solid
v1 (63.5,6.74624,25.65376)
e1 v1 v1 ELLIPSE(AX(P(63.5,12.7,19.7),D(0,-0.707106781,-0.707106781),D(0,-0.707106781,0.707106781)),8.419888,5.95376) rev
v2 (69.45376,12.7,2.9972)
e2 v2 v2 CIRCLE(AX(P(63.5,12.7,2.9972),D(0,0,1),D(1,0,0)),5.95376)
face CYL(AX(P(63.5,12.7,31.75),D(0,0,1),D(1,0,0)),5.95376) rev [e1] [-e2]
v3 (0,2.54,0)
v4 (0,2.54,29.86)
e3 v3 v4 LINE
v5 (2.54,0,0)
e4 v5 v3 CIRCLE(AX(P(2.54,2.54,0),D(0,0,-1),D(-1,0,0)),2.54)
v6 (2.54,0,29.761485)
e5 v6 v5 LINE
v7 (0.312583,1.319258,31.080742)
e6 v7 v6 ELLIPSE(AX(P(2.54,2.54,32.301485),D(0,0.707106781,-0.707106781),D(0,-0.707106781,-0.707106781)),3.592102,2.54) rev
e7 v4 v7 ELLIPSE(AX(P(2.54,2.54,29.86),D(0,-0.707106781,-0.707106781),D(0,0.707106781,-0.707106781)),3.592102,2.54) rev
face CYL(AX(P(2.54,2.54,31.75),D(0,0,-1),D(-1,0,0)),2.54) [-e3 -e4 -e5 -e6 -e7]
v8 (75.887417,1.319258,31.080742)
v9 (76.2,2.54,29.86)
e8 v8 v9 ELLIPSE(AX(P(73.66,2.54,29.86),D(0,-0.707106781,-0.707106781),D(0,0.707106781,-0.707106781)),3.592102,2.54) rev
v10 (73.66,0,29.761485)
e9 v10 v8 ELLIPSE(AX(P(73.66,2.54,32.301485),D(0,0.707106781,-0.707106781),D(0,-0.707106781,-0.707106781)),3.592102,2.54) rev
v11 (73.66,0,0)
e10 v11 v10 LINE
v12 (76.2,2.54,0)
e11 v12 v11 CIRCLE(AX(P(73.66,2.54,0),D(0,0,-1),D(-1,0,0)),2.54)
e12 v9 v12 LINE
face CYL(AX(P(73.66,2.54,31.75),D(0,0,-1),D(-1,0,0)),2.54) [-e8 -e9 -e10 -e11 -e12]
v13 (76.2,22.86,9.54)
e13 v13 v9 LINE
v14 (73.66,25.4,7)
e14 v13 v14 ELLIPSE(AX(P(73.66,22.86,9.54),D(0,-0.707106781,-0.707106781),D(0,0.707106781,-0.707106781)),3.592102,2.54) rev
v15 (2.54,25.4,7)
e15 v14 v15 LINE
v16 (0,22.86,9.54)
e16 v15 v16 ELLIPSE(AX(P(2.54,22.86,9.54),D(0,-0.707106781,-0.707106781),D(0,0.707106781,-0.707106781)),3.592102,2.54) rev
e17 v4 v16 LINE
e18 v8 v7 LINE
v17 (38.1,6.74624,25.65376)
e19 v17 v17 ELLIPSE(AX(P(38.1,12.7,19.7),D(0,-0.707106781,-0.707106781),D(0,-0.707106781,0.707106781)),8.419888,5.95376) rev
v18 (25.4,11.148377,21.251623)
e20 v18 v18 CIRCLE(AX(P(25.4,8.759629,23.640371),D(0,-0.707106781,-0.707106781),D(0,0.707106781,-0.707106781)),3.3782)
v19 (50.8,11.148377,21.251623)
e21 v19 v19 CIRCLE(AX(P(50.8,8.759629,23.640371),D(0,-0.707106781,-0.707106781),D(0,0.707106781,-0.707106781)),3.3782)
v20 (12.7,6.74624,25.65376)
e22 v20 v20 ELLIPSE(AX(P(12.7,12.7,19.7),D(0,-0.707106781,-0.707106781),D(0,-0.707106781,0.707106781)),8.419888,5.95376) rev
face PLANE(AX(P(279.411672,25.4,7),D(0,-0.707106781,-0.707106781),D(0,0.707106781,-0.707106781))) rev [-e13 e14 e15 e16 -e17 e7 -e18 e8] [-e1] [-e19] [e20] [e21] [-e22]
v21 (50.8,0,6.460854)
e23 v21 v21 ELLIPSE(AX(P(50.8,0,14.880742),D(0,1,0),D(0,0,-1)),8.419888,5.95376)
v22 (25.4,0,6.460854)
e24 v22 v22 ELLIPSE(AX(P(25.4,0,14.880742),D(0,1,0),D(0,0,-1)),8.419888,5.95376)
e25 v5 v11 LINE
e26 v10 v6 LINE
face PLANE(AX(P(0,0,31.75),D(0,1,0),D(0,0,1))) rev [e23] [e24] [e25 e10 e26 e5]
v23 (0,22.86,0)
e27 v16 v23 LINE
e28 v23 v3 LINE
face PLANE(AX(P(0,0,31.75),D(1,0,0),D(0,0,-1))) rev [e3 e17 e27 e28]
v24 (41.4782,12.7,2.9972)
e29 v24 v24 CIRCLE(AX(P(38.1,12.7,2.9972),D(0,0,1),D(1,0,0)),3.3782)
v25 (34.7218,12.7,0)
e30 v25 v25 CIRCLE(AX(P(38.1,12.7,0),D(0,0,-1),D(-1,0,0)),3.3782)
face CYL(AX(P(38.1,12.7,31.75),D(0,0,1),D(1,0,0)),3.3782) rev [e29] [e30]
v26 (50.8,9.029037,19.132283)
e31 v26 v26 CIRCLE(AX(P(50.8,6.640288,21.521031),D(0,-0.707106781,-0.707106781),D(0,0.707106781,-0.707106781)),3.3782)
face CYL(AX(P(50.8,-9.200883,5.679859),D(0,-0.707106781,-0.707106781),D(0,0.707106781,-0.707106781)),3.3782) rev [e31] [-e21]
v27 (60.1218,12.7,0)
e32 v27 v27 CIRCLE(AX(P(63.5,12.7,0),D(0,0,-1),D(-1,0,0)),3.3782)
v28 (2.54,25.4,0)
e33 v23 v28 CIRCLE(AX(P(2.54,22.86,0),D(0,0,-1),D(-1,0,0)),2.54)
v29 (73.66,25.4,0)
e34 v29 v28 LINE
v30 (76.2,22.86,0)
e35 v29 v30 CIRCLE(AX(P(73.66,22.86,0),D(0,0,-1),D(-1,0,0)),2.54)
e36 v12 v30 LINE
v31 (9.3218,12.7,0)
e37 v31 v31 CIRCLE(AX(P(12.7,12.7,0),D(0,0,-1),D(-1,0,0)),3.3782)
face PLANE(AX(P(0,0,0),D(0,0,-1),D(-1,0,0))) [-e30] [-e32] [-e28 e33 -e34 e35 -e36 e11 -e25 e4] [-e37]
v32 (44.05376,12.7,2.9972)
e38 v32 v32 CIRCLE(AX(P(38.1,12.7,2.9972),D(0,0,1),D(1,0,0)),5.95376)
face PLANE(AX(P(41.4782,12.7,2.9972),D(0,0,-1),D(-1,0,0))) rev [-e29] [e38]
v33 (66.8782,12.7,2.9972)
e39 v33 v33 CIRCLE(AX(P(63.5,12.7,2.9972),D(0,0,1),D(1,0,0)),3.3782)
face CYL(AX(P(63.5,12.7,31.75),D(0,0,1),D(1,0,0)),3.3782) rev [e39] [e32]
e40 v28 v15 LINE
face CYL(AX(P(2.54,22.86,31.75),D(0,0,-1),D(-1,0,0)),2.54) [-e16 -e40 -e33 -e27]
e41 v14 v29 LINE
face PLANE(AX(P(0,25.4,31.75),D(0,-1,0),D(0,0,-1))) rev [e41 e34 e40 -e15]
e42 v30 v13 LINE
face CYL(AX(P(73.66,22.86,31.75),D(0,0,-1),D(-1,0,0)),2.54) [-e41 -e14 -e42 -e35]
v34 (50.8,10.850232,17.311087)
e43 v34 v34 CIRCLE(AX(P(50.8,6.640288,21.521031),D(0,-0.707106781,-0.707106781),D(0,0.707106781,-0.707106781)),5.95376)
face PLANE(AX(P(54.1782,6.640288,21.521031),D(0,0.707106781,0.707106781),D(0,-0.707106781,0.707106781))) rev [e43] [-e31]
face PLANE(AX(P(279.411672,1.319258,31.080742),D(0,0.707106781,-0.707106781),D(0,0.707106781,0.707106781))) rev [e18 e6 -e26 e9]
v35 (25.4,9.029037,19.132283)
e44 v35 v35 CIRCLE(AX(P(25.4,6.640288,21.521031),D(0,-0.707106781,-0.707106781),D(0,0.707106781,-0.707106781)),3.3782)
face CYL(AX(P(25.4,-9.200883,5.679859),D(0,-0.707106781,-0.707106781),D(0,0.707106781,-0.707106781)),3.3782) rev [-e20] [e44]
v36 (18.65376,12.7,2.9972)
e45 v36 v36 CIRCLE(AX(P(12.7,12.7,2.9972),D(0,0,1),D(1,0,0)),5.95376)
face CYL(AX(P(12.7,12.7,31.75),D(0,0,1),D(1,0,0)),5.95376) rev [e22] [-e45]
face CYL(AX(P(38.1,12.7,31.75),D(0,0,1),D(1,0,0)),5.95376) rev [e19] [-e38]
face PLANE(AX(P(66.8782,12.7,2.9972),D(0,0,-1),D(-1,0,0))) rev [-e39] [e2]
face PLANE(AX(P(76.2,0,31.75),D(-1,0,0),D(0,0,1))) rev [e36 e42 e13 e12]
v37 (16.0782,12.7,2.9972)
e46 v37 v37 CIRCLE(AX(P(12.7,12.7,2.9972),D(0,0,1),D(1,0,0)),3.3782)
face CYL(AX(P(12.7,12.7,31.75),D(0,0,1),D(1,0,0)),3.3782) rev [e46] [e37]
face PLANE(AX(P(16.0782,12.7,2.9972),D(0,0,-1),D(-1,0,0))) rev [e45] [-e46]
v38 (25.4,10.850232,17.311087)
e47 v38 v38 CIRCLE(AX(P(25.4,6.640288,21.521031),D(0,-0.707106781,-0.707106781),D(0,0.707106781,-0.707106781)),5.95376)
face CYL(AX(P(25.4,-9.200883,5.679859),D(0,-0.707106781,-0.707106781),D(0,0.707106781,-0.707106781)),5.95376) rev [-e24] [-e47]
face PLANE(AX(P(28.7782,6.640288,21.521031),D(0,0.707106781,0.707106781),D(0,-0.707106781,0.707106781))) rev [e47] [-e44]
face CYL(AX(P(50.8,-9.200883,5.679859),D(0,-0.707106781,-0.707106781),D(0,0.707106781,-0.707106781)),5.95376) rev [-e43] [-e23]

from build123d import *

# Parameters (mm, degrees)
SKETCH3_W                                        = 76.2
SKETCH3_H                                        = 25.4
BOSS_EXTRUDE1_DEPTH                              = 31.75
CBORE_FOR_1_4_BUTTON_HEAD_CAP_SCREW1_D           = 6.7564
CBORE_FOR_1_4_BUTTON_HEAD_CAP_SCREW1_CBORE_D     = 11.90752
CBORE_FOR_1_4_BUTTON_HEAD_CAP_SCREW1_CBORE_DEPTH = 28.7528
CUT_EXTRUDE1_START                               = -76.2
CUT_EXTRUDE1_DEPTH                               = 76.2
CBORE_FOR_1_4_BUTTON_HEAD_CAP_SCREW2_D           = 6.7564
CBORE_FOR_1_4_BUTTON_HEAD_CAP_SCREW2_CBORE_D     = 11.90752
CBORE_FOR_1_4_BUTTON_HEAD_CAP_SCREW2_CBORE_DEPTH = 22.4028
FILLET1_R                                        = 2.54


# Read off the part's stored shape, not the designer's step: Cut-Extrude1
with BuildPart() as part:
    # Sketch3 → Boss-Extrude1 (new body)
    with BuildSketch(Plane.XY):
        with Locations((38.1, 12.7)):
            Rectangle(SKETCH3_W, SKETCH3_H)
    extrude(amount=BOSS_EXTRUDE1_DEPTH)

    # CBORE for 1/4 Button Head Cap Screw1 (through all)
    with Locations(Plane.XY.offset(31.75)):
        with Locations((12.7, 12.7), (38.1, 12.7), (63.5, 12.7)):
            CounterBoreHole(CBORE_FOR_1_4_BUTTON_HEAD_CAP_SCREW1_D / 2, CBORE_FOR_1_4_BUTTON_HEAD_CAP_SCREW1_CBORE_D / 2, CBORE_FOR_1_4_BUTTON_HEAD_CAP_SCREW1_CBORE_DEPTH)

    # Cut-Extrude1 outline → Cut-Extrude1 (cut)
    with BuildSketch(Plane(origin=(76.2, 0, 0), x_dir=(0, 0, -1), z_dir=(1, 0, 0)).offset(CUT_EXTRUDE1_START)):
        Polygon((-31.75, 0), (-29.761484683, 0), (-31.080742341, 1.319257659), (-7, 25.4), (-31.75, 25.4), align=None)
    extrude(amount=CUT_EXTRUDE1_DEPTH, mode=Mode.SUBTRACT)

    # CBORE for 1/4 Button Head Cap Screw2 (through all)
    with Locations(Plane(origin=(0, -1.760512242, -1.760512242), x_dir=(1, 0, 0), z_dir=(0, -0.7071067811865437, -0.7071067811865513))):
        with Locations((25.4, 10.522273819), (50.8, 10.522273819)):
            CounterBoreHole(CBORE_FOR_1_4_BUTTON_HEAD_CAP_SCREW2_D / 2, CBORE_FOR_1_4_BUTTON_HEAD_CAP_SCREW2_CBORE_D / 2, CBORE_FOR_1_4_BUTTON_HEAD_CAP_SCREW2_CBORE_DEPTH)

    # Fillet1
    fillet1_edges = [part.edges().sort_by_distance(p)[0] for p in [
        (0, 0, 14.880742341),
        (0, 25.4, 3.5),
        (76.2, 25.4, 3.5),
        (76.2, 0, 14.880742341),
    ]]
    fillet(fillet1_edges, radius=FILLET1_R)


solid = part.part
